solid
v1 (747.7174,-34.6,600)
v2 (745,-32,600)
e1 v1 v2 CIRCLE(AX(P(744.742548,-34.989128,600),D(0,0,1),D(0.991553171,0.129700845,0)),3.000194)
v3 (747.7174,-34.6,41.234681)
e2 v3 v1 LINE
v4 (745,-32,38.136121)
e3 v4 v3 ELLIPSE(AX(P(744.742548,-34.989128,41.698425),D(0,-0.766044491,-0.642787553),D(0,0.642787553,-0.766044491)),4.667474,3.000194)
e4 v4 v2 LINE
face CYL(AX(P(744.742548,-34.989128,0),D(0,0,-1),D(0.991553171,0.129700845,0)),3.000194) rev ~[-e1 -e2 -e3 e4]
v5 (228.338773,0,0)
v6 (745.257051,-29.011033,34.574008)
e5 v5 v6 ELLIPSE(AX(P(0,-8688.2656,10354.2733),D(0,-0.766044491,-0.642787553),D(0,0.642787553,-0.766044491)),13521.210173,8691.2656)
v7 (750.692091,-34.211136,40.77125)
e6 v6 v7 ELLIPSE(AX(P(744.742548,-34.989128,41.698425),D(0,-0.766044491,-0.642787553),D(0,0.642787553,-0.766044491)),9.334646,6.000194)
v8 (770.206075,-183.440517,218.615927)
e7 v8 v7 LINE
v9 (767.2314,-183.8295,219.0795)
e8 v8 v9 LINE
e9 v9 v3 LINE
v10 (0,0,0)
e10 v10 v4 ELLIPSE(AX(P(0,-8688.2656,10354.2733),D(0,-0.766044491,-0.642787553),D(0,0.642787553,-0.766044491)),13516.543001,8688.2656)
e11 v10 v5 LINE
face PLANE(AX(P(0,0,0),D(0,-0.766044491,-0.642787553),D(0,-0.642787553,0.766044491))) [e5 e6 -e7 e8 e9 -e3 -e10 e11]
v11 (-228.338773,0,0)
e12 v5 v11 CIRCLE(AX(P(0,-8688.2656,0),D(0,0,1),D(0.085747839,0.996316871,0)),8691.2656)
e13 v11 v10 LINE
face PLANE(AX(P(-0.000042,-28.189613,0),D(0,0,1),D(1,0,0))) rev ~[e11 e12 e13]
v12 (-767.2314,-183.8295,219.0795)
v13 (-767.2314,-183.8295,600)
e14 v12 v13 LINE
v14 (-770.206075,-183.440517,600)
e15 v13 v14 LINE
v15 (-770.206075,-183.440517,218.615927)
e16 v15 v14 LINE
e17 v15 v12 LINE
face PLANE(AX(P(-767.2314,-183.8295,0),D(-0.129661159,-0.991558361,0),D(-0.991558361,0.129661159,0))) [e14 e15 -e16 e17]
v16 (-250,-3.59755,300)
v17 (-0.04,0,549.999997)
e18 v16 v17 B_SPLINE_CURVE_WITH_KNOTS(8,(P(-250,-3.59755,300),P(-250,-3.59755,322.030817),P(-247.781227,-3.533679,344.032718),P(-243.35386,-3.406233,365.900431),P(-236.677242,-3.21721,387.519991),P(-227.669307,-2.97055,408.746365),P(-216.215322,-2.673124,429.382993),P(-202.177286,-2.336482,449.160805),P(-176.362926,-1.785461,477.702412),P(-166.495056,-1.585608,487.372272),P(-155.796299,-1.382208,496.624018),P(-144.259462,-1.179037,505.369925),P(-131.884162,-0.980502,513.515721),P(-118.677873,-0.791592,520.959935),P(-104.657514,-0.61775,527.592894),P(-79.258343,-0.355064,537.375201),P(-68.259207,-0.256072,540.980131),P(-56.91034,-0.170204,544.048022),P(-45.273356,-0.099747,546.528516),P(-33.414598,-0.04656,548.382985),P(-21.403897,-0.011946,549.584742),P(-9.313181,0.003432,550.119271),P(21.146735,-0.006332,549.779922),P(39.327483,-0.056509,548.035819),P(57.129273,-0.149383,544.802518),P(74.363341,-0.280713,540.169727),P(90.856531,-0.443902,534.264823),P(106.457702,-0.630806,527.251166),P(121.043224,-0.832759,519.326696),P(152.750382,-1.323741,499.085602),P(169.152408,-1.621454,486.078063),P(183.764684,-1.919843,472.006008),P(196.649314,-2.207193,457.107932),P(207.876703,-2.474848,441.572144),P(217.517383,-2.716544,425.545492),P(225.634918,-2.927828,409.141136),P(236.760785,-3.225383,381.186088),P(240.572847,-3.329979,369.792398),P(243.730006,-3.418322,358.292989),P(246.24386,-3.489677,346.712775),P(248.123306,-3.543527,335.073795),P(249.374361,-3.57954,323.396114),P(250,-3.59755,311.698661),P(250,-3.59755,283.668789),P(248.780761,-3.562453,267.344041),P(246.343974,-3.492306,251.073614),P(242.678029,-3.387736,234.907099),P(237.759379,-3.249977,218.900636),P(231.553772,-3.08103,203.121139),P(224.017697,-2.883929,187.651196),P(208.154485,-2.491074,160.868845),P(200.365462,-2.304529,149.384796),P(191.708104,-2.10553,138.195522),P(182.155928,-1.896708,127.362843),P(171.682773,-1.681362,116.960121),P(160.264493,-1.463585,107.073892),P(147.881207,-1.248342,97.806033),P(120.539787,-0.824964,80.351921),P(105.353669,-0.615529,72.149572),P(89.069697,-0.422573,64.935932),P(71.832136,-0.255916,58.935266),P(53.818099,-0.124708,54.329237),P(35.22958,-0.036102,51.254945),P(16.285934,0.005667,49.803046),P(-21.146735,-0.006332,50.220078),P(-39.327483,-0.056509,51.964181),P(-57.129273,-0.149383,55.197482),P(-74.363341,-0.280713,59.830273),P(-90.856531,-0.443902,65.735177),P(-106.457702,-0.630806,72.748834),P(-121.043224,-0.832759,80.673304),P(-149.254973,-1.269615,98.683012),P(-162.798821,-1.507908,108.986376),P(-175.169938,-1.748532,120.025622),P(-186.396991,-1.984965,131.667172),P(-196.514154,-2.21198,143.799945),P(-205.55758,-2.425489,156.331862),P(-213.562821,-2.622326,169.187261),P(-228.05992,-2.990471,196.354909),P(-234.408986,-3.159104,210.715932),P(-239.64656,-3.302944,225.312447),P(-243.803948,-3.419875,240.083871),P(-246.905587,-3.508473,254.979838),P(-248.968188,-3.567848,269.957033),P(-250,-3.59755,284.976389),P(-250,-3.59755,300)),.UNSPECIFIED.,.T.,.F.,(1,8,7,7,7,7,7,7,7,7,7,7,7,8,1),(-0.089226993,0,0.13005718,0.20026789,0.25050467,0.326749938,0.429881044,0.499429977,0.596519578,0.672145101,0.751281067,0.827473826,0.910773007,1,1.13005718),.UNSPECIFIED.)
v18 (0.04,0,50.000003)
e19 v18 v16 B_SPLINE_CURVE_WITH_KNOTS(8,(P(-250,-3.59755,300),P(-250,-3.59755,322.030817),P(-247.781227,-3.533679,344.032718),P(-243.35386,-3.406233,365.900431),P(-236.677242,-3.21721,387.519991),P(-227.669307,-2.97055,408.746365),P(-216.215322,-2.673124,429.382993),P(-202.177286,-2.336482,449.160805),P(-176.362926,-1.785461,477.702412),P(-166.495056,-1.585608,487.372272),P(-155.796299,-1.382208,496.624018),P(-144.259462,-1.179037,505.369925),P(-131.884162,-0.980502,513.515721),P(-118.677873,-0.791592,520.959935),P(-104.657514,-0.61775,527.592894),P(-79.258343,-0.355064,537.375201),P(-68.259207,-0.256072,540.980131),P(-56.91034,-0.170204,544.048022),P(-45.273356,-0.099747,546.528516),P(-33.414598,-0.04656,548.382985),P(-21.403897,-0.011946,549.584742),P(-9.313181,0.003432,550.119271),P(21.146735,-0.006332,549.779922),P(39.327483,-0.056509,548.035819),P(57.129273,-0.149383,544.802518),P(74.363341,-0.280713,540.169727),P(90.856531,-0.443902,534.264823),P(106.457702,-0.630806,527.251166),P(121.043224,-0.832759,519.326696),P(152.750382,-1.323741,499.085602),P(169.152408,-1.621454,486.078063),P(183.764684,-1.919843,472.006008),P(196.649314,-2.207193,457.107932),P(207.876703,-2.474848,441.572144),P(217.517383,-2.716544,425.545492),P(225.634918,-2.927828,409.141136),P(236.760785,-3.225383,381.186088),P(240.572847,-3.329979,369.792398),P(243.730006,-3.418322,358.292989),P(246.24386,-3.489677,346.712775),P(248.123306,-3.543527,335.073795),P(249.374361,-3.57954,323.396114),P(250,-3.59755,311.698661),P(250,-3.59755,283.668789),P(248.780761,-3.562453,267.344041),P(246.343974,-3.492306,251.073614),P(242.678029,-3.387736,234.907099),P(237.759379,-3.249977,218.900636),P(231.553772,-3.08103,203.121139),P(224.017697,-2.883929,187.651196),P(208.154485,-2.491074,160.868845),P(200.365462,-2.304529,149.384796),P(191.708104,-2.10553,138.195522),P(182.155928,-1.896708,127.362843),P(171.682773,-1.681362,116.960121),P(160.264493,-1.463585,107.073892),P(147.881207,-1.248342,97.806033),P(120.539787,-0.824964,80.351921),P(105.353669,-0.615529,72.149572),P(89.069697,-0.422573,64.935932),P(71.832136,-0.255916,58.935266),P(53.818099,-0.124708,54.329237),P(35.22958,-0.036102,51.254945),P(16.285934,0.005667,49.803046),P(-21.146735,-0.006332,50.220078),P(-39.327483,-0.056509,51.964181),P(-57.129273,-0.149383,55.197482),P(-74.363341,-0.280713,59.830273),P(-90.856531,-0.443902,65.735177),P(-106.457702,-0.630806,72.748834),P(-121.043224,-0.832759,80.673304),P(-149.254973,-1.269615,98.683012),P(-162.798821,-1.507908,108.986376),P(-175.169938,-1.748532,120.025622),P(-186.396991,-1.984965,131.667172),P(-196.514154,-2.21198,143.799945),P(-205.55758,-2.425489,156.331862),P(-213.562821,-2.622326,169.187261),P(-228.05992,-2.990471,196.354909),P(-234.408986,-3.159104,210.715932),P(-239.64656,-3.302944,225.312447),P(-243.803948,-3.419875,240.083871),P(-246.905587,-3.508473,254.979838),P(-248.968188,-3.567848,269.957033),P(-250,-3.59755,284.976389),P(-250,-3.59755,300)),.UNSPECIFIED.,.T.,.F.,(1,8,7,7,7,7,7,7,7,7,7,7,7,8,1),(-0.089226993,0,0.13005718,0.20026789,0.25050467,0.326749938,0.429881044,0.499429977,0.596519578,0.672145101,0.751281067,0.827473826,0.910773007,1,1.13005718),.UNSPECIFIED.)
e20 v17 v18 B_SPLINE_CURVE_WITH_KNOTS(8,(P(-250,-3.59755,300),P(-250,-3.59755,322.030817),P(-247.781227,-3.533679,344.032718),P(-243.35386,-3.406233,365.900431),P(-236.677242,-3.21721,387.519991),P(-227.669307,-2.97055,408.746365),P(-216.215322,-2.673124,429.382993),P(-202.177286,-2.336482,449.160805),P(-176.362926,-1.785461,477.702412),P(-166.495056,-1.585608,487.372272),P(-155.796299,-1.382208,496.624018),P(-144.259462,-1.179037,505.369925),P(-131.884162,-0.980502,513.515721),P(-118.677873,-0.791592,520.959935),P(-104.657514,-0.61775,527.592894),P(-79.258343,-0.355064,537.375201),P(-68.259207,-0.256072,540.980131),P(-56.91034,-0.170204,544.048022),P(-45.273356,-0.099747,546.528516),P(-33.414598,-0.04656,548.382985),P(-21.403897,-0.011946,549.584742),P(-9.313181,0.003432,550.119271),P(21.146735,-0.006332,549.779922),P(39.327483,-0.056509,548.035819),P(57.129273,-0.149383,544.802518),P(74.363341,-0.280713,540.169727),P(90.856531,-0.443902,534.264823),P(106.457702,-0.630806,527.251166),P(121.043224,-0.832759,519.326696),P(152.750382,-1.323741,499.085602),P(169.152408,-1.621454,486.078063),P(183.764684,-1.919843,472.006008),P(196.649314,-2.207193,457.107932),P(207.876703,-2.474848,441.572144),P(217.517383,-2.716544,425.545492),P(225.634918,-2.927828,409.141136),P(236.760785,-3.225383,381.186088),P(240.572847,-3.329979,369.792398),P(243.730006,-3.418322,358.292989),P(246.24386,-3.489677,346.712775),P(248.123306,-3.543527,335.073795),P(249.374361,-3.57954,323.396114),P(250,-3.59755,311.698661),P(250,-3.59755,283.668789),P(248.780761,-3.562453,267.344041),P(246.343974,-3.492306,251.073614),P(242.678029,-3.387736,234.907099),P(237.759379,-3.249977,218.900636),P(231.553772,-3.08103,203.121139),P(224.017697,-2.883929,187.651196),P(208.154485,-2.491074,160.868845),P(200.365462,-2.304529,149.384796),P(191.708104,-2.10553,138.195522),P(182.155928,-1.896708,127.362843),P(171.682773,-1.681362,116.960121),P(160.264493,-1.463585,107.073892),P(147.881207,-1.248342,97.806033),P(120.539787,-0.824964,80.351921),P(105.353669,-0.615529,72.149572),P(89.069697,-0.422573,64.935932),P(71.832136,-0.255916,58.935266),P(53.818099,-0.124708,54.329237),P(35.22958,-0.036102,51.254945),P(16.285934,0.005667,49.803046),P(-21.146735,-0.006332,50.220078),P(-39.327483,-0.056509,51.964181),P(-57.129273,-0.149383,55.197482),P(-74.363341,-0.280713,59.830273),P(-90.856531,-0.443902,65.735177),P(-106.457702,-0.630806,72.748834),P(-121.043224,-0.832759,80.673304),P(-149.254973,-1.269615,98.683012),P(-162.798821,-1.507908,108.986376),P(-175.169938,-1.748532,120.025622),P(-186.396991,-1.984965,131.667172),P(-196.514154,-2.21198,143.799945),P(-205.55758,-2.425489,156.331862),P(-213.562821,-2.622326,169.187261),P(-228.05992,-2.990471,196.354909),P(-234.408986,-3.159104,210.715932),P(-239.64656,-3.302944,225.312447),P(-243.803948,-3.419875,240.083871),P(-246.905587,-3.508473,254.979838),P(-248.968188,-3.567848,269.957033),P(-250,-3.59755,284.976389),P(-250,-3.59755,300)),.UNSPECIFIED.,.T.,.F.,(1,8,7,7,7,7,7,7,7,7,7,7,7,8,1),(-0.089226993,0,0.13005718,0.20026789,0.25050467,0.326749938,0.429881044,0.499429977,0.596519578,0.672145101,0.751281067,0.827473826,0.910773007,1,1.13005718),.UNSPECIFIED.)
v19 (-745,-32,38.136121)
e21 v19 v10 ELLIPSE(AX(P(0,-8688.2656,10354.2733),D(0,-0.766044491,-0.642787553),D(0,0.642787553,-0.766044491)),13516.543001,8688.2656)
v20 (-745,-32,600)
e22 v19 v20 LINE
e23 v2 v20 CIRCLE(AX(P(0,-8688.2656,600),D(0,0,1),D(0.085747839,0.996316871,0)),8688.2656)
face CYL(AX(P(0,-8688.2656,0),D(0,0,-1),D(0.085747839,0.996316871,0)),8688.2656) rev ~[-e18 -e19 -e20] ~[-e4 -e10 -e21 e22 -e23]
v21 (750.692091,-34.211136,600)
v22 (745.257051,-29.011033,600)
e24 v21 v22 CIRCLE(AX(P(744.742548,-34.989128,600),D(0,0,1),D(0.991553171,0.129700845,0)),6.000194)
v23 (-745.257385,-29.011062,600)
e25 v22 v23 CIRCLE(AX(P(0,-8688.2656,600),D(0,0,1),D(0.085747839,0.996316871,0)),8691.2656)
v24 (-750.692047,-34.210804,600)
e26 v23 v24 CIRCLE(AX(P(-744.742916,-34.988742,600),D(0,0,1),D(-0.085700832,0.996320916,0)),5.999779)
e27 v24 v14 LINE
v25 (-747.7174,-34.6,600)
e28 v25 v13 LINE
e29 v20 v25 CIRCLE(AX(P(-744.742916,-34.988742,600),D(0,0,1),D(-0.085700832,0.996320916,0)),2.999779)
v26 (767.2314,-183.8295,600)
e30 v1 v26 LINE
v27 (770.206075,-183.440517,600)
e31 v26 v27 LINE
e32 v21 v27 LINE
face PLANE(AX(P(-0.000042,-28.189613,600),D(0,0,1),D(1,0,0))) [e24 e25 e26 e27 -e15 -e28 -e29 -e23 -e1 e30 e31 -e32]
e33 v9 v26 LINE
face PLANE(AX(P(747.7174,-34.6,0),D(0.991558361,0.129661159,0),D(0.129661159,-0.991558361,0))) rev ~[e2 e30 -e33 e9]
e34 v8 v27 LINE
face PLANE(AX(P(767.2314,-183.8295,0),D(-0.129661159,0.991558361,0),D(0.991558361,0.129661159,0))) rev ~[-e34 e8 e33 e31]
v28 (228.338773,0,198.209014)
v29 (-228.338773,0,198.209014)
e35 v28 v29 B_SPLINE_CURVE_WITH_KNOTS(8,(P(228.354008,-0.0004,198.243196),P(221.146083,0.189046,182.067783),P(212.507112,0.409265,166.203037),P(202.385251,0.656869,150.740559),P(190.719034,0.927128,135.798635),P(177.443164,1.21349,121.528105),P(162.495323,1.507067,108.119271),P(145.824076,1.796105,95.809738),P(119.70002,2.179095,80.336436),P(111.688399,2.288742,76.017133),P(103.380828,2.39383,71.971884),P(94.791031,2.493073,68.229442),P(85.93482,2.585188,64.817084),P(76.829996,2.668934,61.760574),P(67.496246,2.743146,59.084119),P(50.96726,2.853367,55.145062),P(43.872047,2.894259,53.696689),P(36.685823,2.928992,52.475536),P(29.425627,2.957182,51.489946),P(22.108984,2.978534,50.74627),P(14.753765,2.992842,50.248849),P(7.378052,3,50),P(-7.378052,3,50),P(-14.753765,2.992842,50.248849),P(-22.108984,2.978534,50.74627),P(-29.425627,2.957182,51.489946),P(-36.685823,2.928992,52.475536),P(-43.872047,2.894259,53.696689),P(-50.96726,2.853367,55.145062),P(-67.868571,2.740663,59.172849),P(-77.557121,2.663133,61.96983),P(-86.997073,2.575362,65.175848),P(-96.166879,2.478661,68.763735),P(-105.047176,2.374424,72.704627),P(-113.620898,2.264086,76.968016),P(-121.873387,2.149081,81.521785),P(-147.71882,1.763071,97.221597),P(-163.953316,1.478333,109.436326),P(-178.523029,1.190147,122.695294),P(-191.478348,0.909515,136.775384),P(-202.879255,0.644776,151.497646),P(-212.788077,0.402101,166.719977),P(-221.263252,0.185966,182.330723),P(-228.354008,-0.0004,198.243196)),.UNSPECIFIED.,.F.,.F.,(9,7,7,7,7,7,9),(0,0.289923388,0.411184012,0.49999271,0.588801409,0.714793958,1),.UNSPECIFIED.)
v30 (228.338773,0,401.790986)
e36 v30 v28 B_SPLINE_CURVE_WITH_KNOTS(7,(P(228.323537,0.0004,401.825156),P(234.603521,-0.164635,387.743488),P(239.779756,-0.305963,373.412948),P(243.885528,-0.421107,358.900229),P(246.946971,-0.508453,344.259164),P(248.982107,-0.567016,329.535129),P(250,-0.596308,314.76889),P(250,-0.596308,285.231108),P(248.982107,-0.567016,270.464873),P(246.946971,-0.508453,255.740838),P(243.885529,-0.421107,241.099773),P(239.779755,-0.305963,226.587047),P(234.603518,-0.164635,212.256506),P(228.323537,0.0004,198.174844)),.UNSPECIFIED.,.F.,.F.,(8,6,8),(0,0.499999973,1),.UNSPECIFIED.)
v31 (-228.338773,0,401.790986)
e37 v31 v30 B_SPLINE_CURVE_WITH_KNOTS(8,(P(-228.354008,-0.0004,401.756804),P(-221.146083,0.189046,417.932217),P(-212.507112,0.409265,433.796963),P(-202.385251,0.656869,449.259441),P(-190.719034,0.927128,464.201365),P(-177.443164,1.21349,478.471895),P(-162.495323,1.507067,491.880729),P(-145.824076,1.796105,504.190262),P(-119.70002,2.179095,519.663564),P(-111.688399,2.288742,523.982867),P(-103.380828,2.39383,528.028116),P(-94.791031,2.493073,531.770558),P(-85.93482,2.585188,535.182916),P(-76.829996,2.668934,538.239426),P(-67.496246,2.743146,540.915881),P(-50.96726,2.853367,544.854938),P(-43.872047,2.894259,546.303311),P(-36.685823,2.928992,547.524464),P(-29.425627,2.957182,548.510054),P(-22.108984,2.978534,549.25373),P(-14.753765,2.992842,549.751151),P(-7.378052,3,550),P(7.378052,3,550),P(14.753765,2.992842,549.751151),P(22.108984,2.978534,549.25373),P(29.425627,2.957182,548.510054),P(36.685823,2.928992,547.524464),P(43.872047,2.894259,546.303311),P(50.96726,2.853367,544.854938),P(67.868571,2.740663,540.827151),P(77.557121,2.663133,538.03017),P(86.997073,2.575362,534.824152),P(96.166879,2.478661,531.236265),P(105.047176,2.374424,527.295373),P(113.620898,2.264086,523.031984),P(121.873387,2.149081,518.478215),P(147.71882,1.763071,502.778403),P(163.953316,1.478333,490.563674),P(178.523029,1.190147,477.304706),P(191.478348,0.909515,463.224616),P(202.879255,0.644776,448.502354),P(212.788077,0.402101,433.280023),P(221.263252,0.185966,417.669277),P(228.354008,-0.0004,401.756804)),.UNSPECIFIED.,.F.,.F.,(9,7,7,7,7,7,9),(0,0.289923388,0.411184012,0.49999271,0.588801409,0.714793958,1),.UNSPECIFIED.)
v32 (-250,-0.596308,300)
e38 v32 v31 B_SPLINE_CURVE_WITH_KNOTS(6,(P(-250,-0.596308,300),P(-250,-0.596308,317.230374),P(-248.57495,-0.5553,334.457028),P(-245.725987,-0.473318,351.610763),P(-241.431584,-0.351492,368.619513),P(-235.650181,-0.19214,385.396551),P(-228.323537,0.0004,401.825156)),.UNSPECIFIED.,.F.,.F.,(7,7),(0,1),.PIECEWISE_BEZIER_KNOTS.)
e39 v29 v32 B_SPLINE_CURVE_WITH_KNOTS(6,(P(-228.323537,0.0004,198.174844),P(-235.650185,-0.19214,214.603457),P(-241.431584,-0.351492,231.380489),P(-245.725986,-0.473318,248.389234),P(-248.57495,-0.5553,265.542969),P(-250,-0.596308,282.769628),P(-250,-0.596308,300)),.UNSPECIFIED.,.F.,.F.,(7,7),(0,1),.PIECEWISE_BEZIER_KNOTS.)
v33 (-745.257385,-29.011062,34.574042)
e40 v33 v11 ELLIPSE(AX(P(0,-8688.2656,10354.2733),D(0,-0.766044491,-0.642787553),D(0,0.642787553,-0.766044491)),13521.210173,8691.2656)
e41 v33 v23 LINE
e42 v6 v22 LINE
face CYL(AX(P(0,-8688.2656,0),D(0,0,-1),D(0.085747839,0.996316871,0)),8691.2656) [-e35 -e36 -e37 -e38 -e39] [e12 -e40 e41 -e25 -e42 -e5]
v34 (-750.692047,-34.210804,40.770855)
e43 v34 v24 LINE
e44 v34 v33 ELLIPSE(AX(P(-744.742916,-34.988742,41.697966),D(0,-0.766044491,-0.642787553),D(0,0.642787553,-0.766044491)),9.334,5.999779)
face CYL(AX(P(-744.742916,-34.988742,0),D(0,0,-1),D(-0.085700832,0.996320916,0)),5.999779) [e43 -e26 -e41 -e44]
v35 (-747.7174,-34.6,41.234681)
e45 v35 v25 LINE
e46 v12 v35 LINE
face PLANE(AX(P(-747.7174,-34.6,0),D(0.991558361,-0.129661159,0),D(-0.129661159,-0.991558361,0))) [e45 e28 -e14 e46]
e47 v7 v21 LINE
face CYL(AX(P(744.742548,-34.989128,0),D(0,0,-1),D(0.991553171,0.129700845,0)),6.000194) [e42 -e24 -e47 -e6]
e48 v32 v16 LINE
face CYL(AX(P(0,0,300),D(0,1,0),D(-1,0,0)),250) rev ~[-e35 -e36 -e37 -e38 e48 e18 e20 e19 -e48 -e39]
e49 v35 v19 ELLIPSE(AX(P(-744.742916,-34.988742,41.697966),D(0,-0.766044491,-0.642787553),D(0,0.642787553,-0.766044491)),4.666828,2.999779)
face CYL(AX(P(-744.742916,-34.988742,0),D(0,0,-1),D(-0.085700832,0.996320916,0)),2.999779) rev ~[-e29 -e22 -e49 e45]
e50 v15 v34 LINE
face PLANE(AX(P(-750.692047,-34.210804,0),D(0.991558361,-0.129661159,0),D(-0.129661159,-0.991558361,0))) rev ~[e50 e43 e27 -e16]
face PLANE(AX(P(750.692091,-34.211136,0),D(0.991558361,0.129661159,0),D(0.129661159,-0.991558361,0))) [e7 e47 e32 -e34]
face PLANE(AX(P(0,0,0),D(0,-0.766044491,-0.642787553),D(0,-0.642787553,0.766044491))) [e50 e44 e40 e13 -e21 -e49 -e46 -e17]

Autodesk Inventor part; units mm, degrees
ref_plane "YZ Plane" through (0, 0, 0) normal (1, 0, 0) x (0, 1, 0)
ref_plane "XZ Plane" through (0, 0, 0) normal (0, 1, 0) x (-1, 0, 0)
ref_plane "XY Plane" through (0, 0, 0) normal (0, 0, 1) x (1, 0, 0)
sketch "Sketch1" plane through (0, 0, 0) normal (0, 0, 1) x (1, 0, 0)
  line L0 (-785, -32) -> (785, -32) construction
  line L1 (785, -32) -> (785, 0) construction
  line L2 (785, 0) -> (-785, 0) construction
  line L3 (-785, 0) -> (-785, -32) construction
  arc A0 (745, -32) -> (-745, -32) centre (0, -8688.2656) ccw
  arc A1 (-745, -32) -> (-747.7174, -34.6) centre (-744.7428, -34.989) ccw
  line L4 (-747.7174, -34.6) -> (-767.2314, -183.8295)
  arc A2 (747.7174, -34.6) -> (745, -32) centre (744.7428, -34.989) ccw
  line L5 (747.7174, -34.6) -> (767.2314, -183.8295)
  line L6 (0, 0) -> (0, -32) construction
  dimension "d0" = 1570
  dimension "d1" = 32
  dimension "d2" = 40
  dimension "d14" = 3
  dimension "d15" = 150.5
  dimension "d16" = 97.45
  dimension "d21" = 8688.2656
contour flange "Contour Flange1" sketch "Sketch1" thickness 3 bend radius 3 width 600 along (0, 0, 1) mid plane no both sides no wall seen from (757.4744, -109.2147, 0) lies toward (0.9915584, 0.1296609, 0) curves L5 A2 A0 A1 L4
bend "Bend1"
corner "Corner1"
sketch "Sketch2" plane through (0, 0, 0) normal (1, 0, 0) x (0, 1, 0)
  line L0 (3, 0) -> (3, 600) construction
  line L1 (0, 600) -> (-183.8295, 380.9205)
  line L2 (3, 0) -> (-29.011, 0) projected
  line L3 (0, 0) -> (-183.8295, 219.0795)
  line L4 (-183.8295, 0) -> (-183.8295, 600) projected
  line L5 (3, 600) -> (-183.8295, 600)
  line L6 (-183.8295, 0) -> (3, 0)
  line L7 (0, 0) -> (-32, 0) projected
  line L8 (-32, 600) -> (0, 600) projected
  line L9 (0, 0) -> (0, 600) construction
  point P0 (-29.011, 0)
  point P1 (0, 0)
  dimension "d20" = 40
extrude "Extrusion1" cut sketch "Sketch2" along normal through all both and the other way through all contours L2 L6 L4 L3
sketch "Sketch3" plane through (0, 0, 0) normal (0, 1, 0) x (-1, 0, 0)
  circle A0 centre (0, 300) radius 250
  point P0 (0, 0)
  dimension "d22" = 500
  dimension "d25" = 300
extrude "Extrusion2" cut sketch "Sketch3" along normal through all both and the other way through all
equation "\"d14\" = BendRadius"
equation "\"d3\" = Thickness"
equation "\"d4\" = BendReliefWidth"
equation "\"d5\" = BendReliefDepth"
equation "\"d6\" = MinimumRemnant"
equation "\"d7\" = TransitionRadius"
equation "\"d9\" = BendRadius"
equation "\"d11\" = CornerReliefSize"
equation "\"d12\" = GapSize"
equation "\"d13\" = JacobiRadiusSize"
equation "\"BendRadius\" = Thickness"
equation "\"BendReliefWidth\" = Thickness"
equation "\"BendReliefDepth\" = 0.5 * Thickness"
equation "\"CornerReliefSize\" = 4 * Thickness"
equation "\"MinimumRemnant\" = 2 * Thickness"
equation "\"TransitionRadius\" = BendRadius"
equation "\"JacobiRadiusSize\" = BendRadius"
equation "\"GapSize\" = Thickness"
equation "\"Поясница_радиус\" = d21"
equation "\"Thickness\" = 3"
properties part number "МОО 031 лист  lowerback" material "Stainless Steel AISI 304"
